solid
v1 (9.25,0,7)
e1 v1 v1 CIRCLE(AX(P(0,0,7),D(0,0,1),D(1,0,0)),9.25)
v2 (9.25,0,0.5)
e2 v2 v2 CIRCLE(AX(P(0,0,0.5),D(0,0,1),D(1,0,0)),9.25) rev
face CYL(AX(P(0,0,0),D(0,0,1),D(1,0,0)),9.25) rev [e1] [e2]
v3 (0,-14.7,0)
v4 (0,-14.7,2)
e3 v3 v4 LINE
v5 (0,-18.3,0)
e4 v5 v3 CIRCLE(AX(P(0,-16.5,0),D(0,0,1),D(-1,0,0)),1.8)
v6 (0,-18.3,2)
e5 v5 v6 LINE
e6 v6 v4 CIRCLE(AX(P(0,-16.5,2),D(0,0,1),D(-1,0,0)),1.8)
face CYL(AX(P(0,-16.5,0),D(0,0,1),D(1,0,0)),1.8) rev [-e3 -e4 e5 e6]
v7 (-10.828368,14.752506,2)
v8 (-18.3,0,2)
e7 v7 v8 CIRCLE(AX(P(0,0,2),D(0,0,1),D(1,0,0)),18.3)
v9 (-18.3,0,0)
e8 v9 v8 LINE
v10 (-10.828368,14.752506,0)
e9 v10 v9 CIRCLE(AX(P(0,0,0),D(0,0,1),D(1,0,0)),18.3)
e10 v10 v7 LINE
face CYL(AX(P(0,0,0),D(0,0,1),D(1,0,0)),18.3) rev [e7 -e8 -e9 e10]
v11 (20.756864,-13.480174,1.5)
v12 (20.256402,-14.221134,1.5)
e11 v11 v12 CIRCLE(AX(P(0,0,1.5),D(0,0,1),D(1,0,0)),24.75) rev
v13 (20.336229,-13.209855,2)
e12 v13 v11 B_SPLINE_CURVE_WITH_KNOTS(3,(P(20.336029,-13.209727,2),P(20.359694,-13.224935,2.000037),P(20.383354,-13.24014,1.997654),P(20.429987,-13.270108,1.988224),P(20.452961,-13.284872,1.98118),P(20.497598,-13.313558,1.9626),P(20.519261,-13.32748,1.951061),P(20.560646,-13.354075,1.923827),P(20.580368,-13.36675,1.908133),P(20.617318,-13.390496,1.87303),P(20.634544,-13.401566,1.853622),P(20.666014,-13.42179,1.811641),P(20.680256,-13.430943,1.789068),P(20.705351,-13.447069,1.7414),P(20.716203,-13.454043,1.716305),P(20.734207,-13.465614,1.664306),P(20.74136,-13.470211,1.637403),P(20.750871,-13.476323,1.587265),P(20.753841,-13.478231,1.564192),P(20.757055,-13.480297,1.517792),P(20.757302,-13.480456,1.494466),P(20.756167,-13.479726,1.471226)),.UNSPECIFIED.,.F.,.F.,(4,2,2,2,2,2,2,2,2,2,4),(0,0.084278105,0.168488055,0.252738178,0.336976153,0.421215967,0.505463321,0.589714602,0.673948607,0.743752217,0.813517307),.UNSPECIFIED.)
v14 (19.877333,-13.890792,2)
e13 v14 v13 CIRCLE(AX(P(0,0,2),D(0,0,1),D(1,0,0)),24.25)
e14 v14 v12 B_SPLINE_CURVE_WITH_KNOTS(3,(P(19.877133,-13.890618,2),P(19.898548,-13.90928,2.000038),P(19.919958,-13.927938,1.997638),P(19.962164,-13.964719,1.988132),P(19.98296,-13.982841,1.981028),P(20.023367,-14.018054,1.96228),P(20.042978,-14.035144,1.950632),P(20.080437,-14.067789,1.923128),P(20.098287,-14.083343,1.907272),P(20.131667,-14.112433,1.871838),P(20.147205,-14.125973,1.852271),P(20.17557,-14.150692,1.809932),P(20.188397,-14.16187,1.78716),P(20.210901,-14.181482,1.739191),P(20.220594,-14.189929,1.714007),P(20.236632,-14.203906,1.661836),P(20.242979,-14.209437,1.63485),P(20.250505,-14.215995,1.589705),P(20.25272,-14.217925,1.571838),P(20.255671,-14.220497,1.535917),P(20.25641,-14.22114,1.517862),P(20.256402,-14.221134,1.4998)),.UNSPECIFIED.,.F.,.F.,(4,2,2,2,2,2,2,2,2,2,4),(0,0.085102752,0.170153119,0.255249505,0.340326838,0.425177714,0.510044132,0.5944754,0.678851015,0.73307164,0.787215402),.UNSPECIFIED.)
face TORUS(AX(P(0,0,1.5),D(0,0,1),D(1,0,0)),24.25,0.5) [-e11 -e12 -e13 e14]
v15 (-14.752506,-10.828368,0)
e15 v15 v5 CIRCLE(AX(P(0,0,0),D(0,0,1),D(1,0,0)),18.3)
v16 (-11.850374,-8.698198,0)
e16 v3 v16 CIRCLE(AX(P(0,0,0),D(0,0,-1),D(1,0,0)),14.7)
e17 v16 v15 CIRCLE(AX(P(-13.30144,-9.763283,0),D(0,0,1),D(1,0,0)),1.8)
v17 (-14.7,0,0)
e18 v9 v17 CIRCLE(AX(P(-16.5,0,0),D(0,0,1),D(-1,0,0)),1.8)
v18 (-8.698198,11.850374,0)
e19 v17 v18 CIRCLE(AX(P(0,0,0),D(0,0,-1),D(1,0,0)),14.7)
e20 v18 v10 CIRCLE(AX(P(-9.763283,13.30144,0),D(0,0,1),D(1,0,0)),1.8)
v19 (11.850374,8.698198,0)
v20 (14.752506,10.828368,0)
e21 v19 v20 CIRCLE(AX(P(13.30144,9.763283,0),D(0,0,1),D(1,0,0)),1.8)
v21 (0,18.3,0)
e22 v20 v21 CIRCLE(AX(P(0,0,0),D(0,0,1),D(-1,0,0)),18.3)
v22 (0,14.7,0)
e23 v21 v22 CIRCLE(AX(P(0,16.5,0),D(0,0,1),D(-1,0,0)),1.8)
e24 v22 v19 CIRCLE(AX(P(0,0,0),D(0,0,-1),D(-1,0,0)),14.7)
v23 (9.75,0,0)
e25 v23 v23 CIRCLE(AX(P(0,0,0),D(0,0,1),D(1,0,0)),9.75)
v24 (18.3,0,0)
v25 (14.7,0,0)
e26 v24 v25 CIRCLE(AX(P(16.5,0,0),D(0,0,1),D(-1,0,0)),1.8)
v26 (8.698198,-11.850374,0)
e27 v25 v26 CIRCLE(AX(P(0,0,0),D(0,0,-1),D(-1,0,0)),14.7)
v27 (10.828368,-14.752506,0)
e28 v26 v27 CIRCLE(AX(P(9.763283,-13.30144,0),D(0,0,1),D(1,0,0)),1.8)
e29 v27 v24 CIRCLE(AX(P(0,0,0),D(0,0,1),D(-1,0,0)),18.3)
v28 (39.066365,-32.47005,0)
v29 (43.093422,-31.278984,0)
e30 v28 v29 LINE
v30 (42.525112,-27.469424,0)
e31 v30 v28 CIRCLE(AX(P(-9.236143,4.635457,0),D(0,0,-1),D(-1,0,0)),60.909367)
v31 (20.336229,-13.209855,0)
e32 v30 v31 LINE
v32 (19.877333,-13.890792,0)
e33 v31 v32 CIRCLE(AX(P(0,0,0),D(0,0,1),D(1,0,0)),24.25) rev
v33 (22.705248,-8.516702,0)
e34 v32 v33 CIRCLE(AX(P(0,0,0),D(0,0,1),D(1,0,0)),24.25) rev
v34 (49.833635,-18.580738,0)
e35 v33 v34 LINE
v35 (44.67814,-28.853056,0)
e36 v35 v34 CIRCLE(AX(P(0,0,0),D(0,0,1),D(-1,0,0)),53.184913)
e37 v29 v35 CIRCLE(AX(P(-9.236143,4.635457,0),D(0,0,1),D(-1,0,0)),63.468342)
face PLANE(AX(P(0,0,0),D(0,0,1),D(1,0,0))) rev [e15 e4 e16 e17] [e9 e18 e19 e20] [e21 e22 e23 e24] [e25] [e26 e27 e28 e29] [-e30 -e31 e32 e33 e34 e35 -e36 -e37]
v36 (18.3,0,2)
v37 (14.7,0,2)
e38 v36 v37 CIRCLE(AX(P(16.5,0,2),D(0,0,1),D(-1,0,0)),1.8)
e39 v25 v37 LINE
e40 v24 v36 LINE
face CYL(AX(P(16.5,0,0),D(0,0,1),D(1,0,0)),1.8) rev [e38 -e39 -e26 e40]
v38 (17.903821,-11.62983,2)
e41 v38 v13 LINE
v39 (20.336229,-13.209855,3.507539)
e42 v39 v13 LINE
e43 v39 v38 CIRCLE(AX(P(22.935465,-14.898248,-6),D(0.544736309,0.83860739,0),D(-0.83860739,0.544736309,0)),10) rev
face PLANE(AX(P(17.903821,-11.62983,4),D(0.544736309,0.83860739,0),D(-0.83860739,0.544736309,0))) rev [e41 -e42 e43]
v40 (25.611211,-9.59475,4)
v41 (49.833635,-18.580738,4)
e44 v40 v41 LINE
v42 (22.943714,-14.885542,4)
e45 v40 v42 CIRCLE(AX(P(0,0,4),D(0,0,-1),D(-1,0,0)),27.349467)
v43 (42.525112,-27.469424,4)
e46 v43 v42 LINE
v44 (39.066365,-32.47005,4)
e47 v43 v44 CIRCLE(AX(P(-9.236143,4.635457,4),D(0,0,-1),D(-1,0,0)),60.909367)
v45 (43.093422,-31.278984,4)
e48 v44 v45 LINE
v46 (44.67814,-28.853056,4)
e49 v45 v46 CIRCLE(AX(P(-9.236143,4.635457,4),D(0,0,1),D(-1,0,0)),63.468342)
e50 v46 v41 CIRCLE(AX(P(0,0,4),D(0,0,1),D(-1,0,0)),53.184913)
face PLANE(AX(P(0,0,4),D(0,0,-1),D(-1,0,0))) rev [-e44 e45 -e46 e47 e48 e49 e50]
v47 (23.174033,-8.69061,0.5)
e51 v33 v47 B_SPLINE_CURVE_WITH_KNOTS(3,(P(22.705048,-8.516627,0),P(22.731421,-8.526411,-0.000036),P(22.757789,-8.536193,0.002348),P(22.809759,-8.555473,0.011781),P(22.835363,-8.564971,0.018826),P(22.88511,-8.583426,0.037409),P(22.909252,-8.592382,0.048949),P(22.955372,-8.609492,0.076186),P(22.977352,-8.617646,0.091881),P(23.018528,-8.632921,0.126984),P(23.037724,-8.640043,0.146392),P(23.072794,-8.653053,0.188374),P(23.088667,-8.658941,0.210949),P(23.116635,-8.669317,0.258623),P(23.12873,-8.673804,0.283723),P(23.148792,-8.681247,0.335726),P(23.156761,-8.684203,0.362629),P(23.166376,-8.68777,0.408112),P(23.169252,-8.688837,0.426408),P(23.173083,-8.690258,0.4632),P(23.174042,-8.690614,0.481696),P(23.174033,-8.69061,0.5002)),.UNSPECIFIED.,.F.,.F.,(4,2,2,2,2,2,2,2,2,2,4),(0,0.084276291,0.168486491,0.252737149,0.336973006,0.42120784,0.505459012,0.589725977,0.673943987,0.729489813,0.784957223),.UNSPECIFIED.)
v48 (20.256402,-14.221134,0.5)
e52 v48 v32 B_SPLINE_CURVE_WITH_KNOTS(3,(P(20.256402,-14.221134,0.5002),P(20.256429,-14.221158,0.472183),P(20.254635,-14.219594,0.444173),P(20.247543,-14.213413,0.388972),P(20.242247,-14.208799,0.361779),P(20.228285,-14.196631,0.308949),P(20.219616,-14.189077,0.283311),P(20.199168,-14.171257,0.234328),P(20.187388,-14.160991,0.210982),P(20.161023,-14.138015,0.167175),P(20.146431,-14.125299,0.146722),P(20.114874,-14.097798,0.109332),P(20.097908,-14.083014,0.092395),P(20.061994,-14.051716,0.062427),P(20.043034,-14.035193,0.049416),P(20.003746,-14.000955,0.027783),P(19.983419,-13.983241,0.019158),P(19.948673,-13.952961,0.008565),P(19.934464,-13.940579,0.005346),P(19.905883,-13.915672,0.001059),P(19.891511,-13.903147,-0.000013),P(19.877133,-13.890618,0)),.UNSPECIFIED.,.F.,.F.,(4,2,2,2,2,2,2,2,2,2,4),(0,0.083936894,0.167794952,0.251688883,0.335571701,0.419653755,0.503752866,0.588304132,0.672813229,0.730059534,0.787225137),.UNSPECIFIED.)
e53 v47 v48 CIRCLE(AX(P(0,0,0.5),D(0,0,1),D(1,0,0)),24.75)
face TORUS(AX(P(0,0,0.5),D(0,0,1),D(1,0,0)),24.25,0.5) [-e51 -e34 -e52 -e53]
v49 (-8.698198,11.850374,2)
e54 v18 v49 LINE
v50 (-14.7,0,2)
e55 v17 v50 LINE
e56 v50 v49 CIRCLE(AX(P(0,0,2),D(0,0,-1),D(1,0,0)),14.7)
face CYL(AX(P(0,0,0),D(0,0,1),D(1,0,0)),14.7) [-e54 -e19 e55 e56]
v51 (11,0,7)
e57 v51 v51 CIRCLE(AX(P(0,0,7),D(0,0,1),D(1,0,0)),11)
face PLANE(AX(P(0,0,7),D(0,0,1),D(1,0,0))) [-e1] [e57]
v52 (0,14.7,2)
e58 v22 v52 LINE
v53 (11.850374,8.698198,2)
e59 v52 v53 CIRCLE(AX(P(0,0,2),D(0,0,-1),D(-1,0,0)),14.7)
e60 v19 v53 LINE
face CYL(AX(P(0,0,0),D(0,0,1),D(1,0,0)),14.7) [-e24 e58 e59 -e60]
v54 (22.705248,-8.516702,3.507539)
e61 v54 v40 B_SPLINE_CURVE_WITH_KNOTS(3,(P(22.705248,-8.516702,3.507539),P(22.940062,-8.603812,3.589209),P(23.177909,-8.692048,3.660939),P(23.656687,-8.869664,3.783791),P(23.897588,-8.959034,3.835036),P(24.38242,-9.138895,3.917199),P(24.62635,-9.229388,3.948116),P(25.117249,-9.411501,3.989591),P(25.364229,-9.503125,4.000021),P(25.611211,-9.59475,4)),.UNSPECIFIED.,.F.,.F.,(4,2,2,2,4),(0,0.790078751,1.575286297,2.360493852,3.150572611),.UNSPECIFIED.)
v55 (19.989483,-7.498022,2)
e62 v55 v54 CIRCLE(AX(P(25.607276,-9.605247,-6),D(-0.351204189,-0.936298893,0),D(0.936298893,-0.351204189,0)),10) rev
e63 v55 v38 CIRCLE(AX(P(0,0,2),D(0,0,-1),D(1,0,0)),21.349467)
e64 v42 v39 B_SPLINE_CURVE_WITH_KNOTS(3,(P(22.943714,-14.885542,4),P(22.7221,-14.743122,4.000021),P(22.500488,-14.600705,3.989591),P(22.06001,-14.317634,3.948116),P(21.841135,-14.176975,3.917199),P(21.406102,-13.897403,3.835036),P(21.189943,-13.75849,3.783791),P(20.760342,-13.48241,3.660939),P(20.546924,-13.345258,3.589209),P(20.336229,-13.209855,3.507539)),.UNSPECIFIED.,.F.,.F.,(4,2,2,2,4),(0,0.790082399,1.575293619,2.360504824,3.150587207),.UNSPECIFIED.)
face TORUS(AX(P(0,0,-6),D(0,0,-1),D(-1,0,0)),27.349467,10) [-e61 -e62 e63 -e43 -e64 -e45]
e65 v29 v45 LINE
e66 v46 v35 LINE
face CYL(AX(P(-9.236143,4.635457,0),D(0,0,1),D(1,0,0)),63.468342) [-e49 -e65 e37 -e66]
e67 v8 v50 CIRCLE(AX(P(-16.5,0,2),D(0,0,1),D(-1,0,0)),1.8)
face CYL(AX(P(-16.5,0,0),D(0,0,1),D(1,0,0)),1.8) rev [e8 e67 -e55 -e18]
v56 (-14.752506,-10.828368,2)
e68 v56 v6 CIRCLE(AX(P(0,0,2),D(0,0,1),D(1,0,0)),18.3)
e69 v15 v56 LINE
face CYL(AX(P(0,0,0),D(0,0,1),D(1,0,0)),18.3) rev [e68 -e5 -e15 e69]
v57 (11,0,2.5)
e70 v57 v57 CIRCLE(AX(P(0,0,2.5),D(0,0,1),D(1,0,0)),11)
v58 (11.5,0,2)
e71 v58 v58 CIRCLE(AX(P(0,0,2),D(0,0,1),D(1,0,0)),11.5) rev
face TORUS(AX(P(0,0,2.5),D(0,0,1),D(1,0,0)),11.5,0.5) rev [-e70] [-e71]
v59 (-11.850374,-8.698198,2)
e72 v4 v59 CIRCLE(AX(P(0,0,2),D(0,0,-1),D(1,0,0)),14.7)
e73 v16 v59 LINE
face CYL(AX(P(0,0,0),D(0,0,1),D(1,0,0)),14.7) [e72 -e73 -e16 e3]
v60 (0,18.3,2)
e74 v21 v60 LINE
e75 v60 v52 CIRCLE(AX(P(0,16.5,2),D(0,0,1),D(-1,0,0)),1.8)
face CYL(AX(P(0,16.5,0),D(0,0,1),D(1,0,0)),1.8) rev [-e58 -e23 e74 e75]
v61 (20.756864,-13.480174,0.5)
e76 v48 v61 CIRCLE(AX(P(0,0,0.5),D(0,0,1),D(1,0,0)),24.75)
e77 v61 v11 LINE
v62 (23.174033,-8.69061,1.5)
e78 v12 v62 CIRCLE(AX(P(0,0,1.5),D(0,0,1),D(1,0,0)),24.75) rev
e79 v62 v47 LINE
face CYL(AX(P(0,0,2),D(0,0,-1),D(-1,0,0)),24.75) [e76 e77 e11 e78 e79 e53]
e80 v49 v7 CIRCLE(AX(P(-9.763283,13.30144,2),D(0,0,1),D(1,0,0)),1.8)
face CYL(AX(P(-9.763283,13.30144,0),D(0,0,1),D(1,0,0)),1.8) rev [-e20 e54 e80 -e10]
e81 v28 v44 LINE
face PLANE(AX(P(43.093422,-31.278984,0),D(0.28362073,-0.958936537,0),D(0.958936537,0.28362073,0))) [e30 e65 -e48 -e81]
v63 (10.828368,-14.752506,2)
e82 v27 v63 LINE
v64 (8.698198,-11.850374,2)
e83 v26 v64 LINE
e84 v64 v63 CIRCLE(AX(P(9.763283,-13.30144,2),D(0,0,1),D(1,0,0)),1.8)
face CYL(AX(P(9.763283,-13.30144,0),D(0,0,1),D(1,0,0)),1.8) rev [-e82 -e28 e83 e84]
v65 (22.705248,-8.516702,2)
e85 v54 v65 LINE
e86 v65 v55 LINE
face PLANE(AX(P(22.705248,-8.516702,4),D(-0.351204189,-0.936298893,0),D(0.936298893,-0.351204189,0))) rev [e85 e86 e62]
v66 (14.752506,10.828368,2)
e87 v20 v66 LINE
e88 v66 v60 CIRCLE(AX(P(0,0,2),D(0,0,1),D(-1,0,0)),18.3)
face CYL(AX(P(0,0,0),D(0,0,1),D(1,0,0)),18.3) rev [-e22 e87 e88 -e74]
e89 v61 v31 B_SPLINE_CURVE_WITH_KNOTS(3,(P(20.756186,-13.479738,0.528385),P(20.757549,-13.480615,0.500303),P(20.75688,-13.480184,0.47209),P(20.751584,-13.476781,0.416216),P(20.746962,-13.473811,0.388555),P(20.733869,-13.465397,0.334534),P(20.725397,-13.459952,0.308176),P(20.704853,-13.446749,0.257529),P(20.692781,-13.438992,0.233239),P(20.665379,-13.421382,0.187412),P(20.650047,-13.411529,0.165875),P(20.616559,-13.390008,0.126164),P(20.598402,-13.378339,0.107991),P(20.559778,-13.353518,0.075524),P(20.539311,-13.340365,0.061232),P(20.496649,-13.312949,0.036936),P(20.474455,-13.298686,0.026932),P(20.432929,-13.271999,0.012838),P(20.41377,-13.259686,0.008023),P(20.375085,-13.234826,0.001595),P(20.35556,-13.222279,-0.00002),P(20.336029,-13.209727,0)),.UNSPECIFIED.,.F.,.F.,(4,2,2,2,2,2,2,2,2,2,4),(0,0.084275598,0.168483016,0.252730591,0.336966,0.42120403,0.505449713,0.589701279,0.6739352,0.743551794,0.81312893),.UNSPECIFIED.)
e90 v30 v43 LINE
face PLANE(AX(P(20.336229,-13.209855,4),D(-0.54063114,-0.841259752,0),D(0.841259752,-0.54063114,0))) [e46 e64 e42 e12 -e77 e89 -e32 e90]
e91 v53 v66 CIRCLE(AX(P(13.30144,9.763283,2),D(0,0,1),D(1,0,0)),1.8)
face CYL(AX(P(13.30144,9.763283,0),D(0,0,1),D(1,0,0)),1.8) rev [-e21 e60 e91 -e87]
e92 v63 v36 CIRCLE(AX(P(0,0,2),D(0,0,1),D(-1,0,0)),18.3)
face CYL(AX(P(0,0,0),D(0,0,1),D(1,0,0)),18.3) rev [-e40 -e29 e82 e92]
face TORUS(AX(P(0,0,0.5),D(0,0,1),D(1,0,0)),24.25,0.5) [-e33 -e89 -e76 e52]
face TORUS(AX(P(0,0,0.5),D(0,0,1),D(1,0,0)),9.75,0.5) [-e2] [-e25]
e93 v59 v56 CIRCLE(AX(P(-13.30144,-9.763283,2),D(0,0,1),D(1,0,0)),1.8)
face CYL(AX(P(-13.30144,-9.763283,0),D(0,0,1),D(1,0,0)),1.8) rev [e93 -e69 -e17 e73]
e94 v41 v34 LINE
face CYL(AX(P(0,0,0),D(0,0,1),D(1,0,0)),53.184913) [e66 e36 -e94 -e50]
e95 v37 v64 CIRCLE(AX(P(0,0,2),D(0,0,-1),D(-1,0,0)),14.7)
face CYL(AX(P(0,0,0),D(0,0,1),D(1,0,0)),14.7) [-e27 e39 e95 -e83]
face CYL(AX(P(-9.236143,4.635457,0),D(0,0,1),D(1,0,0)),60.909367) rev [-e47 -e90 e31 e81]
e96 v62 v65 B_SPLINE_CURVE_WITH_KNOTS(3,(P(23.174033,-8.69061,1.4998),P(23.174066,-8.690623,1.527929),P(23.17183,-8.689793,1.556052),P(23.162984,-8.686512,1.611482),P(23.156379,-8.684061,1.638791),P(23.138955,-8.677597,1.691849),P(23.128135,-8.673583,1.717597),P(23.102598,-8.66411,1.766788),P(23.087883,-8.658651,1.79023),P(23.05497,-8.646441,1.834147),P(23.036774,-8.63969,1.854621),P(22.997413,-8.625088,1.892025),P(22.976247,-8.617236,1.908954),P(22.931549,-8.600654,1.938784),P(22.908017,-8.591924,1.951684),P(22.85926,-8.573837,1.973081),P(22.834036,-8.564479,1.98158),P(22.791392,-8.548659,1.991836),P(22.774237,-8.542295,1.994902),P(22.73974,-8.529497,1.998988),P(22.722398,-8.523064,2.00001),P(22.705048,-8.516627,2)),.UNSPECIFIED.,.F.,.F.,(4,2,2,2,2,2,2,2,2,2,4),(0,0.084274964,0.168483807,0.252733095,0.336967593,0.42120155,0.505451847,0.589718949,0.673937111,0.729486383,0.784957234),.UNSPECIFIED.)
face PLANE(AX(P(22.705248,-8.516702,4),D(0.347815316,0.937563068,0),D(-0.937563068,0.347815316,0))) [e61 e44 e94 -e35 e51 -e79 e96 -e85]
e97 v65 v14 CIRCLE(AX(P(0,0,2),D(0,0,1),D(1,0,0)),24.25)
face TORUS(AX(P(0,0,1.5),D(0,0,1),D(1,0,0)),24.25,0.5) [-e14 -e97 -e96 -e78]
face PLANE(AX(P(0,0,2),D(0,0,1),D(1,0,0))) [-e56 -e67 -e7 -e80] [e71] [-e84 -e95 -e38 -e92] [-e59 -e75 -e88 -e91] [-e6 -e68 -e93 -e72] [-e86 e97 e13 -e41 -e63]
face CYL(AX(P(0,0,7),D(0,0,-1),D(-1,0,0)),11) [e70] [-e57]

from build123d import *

# Parameters (mm, degrees)
SKETCH3_R                = 24.75
BOSS_EXTRUDE3_DEPTH      = 2
SKETCH7_R                = 9.25
CUT_EXTRUDE2_DEPTH       = 2
BOSS_EXTRUDE6_START      = 5
SKETCH8_R                = 11
SKETCH8_R_2              = 9.25
BOSS_EXTRUDE6_DEPTH      = 5
FILLET31_R               = 0.5
FILLET32_R               = 0.5
CUT_EXTRUDE7_DEPTH       = 2
BOSS_EXTRUDE8_DEPTH      = 2
BOSS_EXTRUDE8_DEPTH_BACK = 2
CUT_EXTRUDE9_START       = -2
CUT_EXTRUDE9_DEPTH       = 2
CUT_EXTRUDE10_START      = -2
CUT_EXTRUDE10_DEPTH      = 2
FILLET33_R               = 0.5
FILLET34_R               = 0.5
CUT_EXTRUDE11_DEPTH      = 4
BOSS_EXTRUDE10_DEPTH     = 4
BOSS_EXTRUDE14_START     = -4
BOSS_EXTRUDE14_DEPTH     = 4
BOSS_EXTRUDE16_DEPTH     = 4
BOSS_EXTRUDE18_DEPTH     = 2
FILLET36_R               = 10
BOSS_EXTRUDE22_DEPTH     = 4


with BuildPart() as part:
    # Sketch3 → Boss-Extrude3 (new body)
    with BuildSketch(Plane.XY):
        Circle(SKETCH3_R)
    extrude(amount=BOSS_EXTRUDE3_DEPTH)

    # Sketch7 → Cut-Extrude2 (cut)
    with BuildSketch(Plane.XY.offset(2)):
        Circle(SKETCH7_R)
    extrude(amount=-CUT_EXTRUDE2_DEPTH, mode=Mode.SUBTRACT)

    # Sketch8 → Boss-Extrude6 (add)
    with BuildSketch(Plane.XY.offset(2).offset(BOSS_EXTRUDE6_START)):
        Circle(SKETCH8_R)
        Circle(SKETCH8_R_2, mode=Mode.SUBTRACT)
    extrude(amount=-BOSS_EXTRUDE6_DEPTH)

    # Fillet31
    fillet31_edges = [part.edges().sort_by_distance(p)[0] for p in [
        (-24.75, 0, 0),
        (-9.25, 0, 0),
    ]]
    fillet(fillet31_edges, radius=FILLET31_R)

    # Fillet32
    fillet32_edges = [part.edges().sort_by_distance(p)[0] for p in [
        (-11, 0, 2),
        (-24.75, 0, 2),
    ]]
    fillet(fillet32_edges, radius=FILLET32_R)

    # Sketch4 → Cut-Extrude7 (cut)
    with BuildSketch(Plane.XY.offset(2)):
        with BuildLine():
            ThreePointArc((-14.7, 0), (-16.5, -1.8), (-18.3, 0))
            ThreePointArc((-18.3, 0), (-16.325580278, 8.268338925), (-10.828368461, 14.752506108))
            ThreePointArc((-10.828368461, 14.752506108), (-8.312216864, 14.366525356), (-8.698197616, 11.850373759))
            ThreePointArc((-8.698197616, 11.850373759), (-13.113990715, 6.641780448), (-14.7, 0))
        make_face()
        with BuildLine():
            ThreePointArc((0, -14.7), (1.8, -16.5), (0, -18.3))
            ThreePointArc((0, -18.3), (-8.268338925, -16.325580278), (-14.752506108, -10.828368461))
            ThreePointArc((-14.752506108, -10.828368461), (-14.366525356, -8.312216864), (-11.850373759, -8.698197616))
            ThreePointArc((-11.850373759, -8.698197616), (-6.641780448, -13.113990715), (0, -14.7))
        make_face()
        with BuildLine():
            ThreePointArc((14.7, 0), (16.5, 1.8), (18.3, 0))
            ThreePointArc((18.3, 0), (16.325580278, -8.268338925), (10.828368461, -14.752506108))
            ThreePointArc((10.828368461, -14.752506108), (8.312216864, -14.366525356), (8.698197616, -11.850373759))
            ThreePointArc((8.698197616, -11.850373759), (13.113990715, -6.641780448), (14.7, 0))
        make_face()
        with BuildLine():
            ThreePointArc((0, 14.7), (-1.8, 16.5), (0, 18.3))
            ThreePointArc((0, 18.3), (8.268338925, 16.325580278), (14.752506108, 10.828368461))
            ThreePointArc((14.752506108, 10.828368461), (14.366525356, 8.312216864), (11.850373759, 8.698197616))
            ThreePointArc((11.850373759, 8.698197616), (6.641780448, 13.113990715), (0, 14.7))
        make_face()
    extrude(amount=-CUT_EXTRUDE7_DEPTH, mode=Mode.SUBTRACT)

    # Sketch13 → Boss-Extrude8 (add, two sides: drawn at the far end of the back side and taken through both)
    with BuildSketch(Plane.XY.offset(2).offset(-BOSS_EXTRUDE8_DEPTH_BACK)):
        with BuildLine():
            Line((38.819540025, -30.398089039), (19.877333475, -13.890792415))
            ThreePointArc((19.877333475, -13.890792415), (21.459544814, -11.29382293), (22.704291658, -8.519251158))
            Line((22.704291658, -8.519251158), (47.195410326, -17.604918534))
            ThreePointArc((47.195410326, -17.604918534), (43.423669833, -24.273992336), (38.819540025, -30.398089039))
        make_face()
    extrude(amount=BOSS_EXTRUDE8_DEPTH + BOSS_EXTRUDE8_DEPTH_BACK)

    # Sketch14 → Cut-Extrude9 (cut)
    with BuildSketch(Plane.XY.offset(4).offset(CUT_EXTRUDE9_START)):
        with BuildLine():
            Line((19.850553041, -13.867978765), (38.819540025, -30.398089039))
            ThreePointArc((38.819540025, -30.398089039), (40.286694805, -28.620798349), (41.683322514, -26.787567215))
            Line((41.683322514, -26.787567215), (20.371088677, -13.091372623))
            ThreePointArc((20.371088677, -13.091372623), (20.11456922, -13.482188107), (19.850553041, -13.867978765))
        make_face()
    extrude(amount=CUT_EXTRUDE9_DEPTH, mode=Mode.SUBTRACT)

    # Sketch15 → Cut-Extrude10 (cut)
    with BuildSketch(Plane.XY.offset(2).offset(CUT_EXTRUDE10_START)):
        with BuildLine():
            Line((38.819540025, -30.398089039), (20.256402439, -14.22113428))
            ThreePointArc((20.256402439, -14.22113428), (20.514190977, -13.846677166), (20.765058212, -13.467548308))
            Line((20.765058212, -13.467548308), (41.683322514, -26.787567215))
            ThreePointArc((41.683322514, -26.787567215), (40.286694805, -28.620798349), (38.819540025, -30.398089039))
        make_face()
    extrude(amount=CUT_EXTRUDE10_DEPTH, mode=Mode.SUBTRACT)

    # Fillet33
    # the kernel refuses this fillet: 0.5 mm, written as the material it takes off along each edge
    with BuildSketch(Plane(origin=(0, 0, 2), x_dir=(0.7883894686157571, -0.6151764346720087, 0), z_dir=(-0.6151764346720087, -0.7883894686157571, 0))) as fillet33_piece_1_section:
        with BuildLine():
            CenterArc((24.75 - FILLET33_R, -FILLET33_R), FILLET33_R, 0, 90)
            Line((24.75 - FILLET33_R, 0), (24.75, 0))
            Line((24.75, 0), (24.75, -FILLET33_R))
        make_face()
    fillet33_piece_1 = revolve(axis=Axis((0, 0, 2), (0, 0, 1)), revolution_arc=7.892324656, mode=Mode.PRIVATE)
    fillet33_piece_1 = split(fillet33_piece_1, bisect_by=Plane(origin=(20.636081205, -13.385420262, 1.886497018), z_dir=(-0.5371164504415562, -0.8435081023114498, 0)), keep=Keep.TOP, mode=Mode.PRIVATE)
    add(fillet33_piece_1, mode=Mode.SUBTRACT)

    # Fillet34
    # the kernel refuses this fillet: 0.5 mm, written as the material it takes off along each edge
    with BuildSketch(Plane(origin=(0, 0, 0), x_dir=(0.7883894686157571, -0.6151764346720087, 0), z_dir=(-0.6151764346720087, -0.7883894686157571, 0))) as fillet34_piece_1_section:
        with BuildLine():
            CenterArc((24.75 - FILLET34_R, FILLET34_R), FILLET34_R, 270, 90)
            Line((24.75, FILLET34_R), (24.75, 0))
            Line((24.75, 0), (24.75 - FILLET34_R, 0))
        make_face()
    fillet34_piece_1 = revolve(axis=Axis((0, 0, 0), (0, 0, 1)), revolution_arc=7.892324656, mode=Mode.PRIVATE)
    fillet34_piece_1 = split(fillet34_piece_1, bisect_by=Plane(origin=(20.636080982, -13.38542012, 0.113502928), z_dir=(-0.5371164504415562, -0.8435081023114498, 0)), keep=Keep.TOP, mode=Mode.PRIVATE)
    add(fillet34_piece_1, mode=Mode.SUBTRACT)

    # Sketch16 → Cut-Extrude11 (cut)
    with BuildSketch(Plane(origin=(0, 0, 0), x_dir=(-1, 0, 0), z_dir=(0, 0, -1))):
        with BuildLine():
            Line((-46.768831726, -17.446667238), (-47.195410326, -17.604918534))
            ThreePointArc((-47.195410326, -17.604918534), (-45.975373397, -19.992187587), (-44.648150349, -22.321570042))
            ThreePointArc((-44.648150349, -22.321570042), (-45.773434679, -19.912370438), (-46.768831726, -17.446667238))
        make_face()
    extrude(amount=-CUT_EXTRUDE11_DEPTH, mode=Mode.SUBTRACT)

    # Sketch17 → Boss-Extrude10 (add)
    with BuildSketch(Plane(origin=(0, 0, 0), x_dir=(-1, 0, 0), z_dir=(0, 0, -1))):
        with BuildLine():
            Line((-41.680315567, -26.785634817), (-41.99318774, -26.986700468))
            ThreePointArc((-41.99318774, -26.986700468), (-43.383421107, -24.68984795), (-44.648150349, -22.321570042))
            ThreePointArc((-44.648150349, -22.321570042), (-43.21497039, -24.587334089), (-41.680315567, -26.785634817))
        make_face()
    extrude(amount=-BOSS_EXTRUDE10_DEPTH)

    # Sketch18 → Boss-Extrude14 (add)
    with BuildSketch(Plane.XY.offset(4).offset(BOSS_EXTRUDE14_START)):
        with BuildLine():
            Line((41.99318774, -26.986700468), (44.742327082, -28.753420356))
            ThreePointArc((44.742327082, -28.753420356), (47.558806026, -23.807456483), (49.830614891, -18.588836286))
            Line((49.830614891, -18.588836286), (46.768831726, -17.446667238))
            ThreePointArc((46.768831726, -17.446667238), (44.636611469, -22.344635492), (41.99318774, -26.986700468))
        make_face()
    extrude(amount=BOSS_EXTRUDE14_DEPTH)

    # Sketch23 → Boss-Extrude16 (add)
    with BuildSketch(Plane(origin=(0, 0, 0), x_dir=(-1, 0, 0), z_dir=(0, 0, -1))):
        with BuildLine():
            Line((-22.705248166, -8.516701574), (-49.833635263, -18.580737641))
            ThreePointArc((-49.833635263, -18.580737641), (-47.534188111, -23.856570908), (-44.678139851, -28.853055892))
            Line((-44.678139851, -28.853055892), (-20.3362292, -13.209855485))
            ThreePointArc((-20.3362292, -13.209855485), (-21.648293625, -10.92766595), (-22.705248166, -8.516701574))
        make_face()
    extrude(amount=-BOSS_EXTRUDE16_DEPTH)

    # Sketch24 → Boss-Extrude18 (add)
    with BuildSketch(Plane.XY.offset(2)):
        with BuildLine():
            Line((22.705248166, -8.516701574), (19.989482511, -7.498022304))
            ThreePointArc((19.989482511, -7.498022304), (19.05894988, -9.620612195), (17.903820956, -11.629829952))
            Line((17.903820956, -11.629829952), (20.3362292, -13.209855485))
            ThreePointArc((20.3362292, -13.209855485), (21.648293625, -10.92766595), (22.705248166, -8.516701574))
        make_face()
    extrude(amount=BOSS_EXTRUDE18_DEPTH)

    # Fillet36
    # the kernel refuses this fillet: 10 mm, written as the material it takes off along each edge
    with BuildSketch(Plane(origin=(0, 0, 4), x_dir=(0.9415001146700814, 0.3370126615963019, 0), z_dir=(-0.3370126615963019, 0.9415001146700814, 0))) as fillet36_piece_1:
        with BuildLine():
            CenterArc((27.349467195, 10), FILLET36_R, 233.130102354, 36.869897646)
            Line((21.349467195, 2), (21.229467195, 1.84))
            ThreePointArc((21.229467195, 1.84), (21.149467195, 1), (21.149467195, 0))
            Line((21.149467195, 0), (21.349467195, -0.2))
            Line((21.349467195, -0.2), (27.349467195, -0.2))
            Line((27.349467195, -0.2), (27.349467195, 0))
        make_face()
    revolve(axis=Axis((0, 0, 4), (0, 0, -1)), revolution_arc=92.95757894, mode=Mode.SUBTRACT)

    # Sketch25 → Boss-Extrude22 (add)
    with BuildSketch(Plane.XY.offset(4)):
        with BuildLine():
            Line((43.093421594, -31.278983813), (39.066364797, -32.470049901))
            ThreePointArc((39.066364797, -32.470049901), (40.85817528, -30.012922175), (42.525112054, -27.469423942))
            Line((42.525112054, -27.469423942), (44.678139851, -28.853055892))
            ThreePointArc((44.678139851, -28.853055892), (43.899627076, -30.075064874), (43.093421594, -31.278983813))
        make_face()
    extrude(amount=-BOSS_EXTRUDE22_DEPTH)


solid = part.part
